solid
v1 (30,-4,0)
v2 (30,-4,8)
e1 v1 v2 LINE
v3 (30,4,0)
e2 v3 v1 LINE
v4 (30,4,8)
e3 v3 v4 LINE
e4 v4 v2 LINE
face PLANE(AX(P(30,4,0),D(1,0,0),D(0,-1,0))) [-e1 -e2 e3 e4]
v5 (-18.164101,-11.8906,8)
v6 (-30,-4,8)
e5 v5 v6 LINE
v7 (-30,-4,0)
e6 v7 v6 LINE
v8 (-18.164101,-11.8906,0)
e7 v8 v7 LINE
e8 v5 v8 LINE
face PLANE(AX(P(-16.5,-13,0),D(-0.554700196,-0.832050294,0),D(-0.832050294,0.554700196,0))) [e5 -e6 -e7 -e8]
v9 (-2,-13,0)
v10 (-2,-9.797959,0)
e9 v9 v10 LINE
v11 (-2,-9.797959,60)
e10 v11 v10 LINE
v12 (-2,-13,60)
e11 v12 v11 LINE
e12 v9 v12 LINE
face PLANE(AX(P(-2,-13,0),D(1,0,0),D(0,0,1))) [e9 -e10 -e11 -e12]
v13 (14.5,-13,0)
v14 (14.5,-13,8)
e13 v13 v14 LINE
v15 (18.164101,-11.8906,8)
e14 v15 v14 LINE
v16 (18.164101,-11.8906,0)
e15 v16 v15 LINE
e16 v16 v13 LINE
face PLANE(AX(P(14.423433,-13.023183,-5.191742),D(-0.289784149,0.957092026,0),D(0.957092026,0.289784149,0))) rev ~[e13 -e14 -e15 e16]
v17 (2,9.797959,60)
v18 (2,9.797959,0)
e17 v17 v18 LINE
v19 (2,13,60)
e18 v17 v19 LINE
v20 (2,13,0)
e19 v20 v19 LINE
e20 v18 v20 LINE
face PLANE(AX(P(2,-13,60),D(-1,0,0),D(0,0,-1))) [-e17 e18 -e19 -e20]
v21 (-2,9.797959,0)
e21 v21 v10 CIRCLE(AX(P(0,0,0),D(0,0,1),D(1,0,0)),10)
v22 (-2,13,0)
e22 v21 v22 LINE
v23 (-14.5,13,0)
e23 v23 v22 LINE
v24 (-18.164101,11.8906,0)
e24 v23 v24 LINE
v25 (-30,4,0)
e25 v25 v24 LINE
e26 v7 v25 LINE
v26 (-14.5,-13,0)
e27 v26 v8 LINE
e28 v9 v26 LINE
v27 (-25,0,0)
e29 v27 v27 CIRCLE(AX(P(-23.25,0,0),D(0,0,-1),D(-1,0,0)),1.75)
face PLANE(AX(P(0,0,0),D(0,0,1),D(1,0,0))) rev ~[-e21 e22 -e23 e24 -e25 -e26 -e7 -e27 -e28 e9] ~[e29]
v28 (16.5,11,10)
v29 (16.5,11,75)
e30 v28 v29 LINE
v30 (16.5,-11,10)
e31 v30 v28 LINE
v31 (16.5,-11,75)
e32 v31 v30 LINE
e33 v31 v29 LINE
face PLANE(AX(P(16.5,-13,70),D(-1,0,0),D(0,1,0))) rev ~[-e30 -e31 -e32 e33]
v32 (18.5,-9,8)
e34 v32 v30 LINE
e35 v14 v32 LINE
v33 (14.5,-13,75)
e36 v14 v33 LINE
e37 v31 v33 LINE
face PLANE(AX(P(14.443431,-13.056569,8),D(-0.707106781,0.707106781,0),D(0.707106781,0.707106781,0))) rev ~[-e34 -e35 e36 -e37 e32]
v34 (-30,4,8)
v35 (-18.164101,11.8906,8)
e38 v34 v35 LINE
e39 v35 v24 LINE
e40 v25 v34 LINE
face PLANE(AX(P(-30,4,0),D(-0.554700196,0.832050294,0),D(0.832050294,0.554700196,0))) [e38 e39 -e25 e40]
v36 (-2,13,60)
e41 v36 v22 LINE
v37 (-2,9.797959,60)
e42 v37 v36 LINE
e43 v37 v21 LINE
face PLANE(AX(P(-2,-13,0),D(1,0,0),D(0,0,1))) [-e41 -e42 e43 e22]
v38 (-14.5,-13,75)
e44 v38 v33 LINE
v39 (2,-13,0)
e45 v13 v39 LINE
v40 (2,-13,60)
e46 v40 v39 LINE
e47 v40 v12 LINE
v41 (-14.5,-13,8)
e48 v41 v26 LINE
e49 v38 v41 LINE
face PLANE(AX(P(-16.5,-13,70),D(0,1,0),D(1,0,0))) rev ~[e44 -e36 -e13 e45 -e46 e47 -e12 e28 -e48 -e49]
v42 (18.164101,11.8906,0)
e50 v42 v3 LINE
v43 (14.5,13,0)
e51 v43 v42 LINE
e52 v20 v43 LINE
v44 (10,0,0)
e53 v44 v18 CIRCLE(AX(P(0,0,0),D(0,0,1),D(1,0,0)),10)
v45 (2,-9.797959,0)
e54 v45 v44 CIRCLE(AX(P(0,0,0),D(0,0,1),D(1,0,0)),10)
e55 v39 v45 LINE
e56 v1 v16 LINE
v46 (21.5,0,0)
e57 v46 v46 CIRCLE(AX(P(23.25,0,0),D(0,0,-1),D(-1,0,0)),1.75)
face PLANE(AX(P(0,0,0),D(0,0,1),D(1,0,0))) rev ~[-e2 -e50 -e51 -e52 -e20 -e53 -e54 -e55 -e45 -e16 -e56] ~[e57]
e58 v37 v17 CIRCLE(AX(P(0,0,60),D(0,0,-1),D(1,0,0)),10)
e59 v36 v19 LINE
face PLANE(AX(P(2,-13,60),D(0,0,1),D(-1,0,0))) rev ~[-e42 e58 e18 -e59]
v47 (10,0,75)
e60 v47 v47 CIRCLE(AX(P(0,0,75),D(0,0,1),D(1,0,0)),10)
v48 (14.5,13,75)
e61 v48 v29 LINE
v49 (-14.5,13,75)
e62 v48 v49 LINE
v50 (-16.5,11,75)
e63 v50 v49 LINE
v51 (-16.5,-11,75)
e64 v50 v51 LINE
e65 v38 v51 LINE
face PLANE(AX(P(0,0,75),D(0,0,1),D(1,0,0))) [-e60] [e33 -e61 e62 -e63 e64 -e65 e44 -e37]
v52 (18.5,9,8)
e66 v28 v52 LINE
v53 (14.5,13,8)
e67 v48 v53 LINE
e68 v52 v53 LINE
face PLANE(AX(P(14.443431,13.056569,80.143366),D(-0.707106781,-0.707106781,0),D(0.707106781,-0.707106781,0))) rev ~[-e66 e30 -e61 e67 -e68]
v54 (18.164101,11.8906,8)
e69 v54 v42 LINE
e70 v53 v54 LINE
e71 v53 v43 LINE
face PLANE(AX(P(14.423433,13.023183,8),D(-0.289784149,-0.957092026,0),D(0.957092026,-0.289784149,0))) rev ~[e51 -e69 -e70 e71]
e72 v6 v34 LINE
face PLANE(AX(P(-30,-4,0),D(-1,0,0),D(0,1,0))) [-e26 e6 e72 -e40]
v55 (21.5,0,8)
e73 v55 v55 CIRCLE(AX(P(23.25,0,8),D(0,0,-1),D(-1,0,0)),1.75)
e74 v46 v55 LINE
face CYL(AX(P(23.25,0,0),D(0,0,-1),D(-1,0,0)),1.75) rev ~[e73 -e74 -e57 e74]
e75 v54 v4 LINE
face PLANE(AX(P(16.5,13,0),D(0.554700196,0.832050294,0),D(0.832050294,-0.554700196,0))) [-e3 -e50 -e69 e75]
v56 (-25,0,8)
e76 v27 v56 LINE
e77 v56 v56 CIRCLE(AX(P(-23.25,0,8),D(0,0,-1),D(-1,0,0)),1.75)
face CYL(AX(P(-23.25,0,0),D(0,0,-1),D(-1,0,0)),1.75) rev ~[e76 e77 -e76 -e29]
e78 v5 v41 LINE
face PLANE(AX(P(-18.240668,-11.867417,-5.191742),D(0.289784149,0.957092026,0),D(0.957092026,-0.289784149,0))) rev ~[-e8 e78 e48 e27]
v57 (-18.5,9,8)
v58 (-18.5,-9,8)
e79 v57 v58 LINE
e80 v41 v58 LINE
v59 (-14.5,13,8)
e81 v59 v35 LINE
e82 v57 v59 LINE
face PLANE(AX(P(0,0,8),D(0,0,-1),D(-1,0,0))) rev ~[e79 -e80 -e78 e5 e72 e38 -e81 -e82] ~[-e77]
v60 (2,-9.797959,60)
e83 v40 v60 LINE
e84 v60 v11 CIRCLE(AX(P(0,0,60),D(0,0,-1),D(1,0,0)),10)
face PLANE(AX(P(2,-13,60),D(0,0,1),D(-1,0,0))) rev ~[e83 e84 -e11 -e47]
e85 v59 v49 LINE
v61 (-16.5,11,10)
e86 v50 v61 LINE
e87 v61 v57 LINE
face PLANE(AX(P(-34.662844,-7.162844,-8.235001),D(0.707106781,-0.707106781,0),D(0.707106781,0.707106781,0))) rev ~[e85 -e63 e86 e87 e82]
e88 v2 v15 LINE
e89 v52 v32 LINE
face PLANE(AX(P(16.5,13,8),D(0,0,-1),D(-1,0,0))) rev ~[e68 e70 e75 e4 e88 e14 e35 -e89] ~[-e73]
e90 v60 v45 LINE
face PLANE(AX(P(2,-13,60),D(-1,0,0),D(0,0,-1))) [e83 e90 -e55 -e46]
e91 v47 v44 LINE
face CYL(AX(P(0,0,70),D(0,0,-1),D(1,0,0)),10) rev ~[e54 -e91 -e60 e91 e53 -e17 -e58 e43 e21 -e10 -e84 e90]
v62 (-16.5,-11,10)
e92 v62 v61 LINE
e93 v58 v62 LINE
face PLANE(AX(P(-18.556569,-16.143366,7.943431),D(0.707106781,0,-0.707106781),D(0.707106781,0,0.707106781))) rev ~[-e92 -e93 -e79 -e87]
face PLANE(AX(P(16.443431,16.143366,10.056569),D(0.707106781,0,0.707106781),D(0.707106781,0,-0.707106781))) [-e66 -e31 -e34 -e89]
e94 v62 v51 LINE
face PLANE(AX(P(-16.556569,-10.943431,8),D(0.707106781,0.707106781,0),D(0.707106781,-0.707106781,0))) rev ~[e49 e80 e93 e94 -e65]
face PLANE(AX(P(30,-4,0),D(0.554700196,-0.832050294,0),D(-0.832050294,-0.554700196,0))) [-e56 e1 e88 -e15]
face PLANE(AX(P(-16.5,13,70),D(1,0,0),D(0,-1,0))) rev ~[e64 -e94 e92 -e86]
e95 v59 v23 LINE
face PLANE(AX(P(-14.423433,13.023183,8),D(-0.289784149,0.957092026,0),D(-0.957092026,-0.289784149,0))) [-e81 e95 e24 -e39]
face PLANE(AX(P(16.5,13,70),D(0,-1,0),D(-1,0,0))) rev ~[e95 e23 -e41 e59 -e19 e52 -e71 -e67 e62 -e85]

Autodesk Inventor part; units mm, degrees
ref_plane "YZ Plane" through (0, 0, 0) normal (1, 0, 0) x (0, 1, 0)
ref_plane "XZ Plane" through (0, 0, 0) normal (0, 1, 0) x (-1, 0, 0)
ref_plane "XY Plane" through (0, 0, 0) normal (0, 0, 1) x (1, 0, 0)
sketch "スケッチ1" plane through (0, 0, 0) normal (0, 0, 1) x (1, 0, 0)
  line L0 (-16.5, 13) -> (16.5, 13)
  line L1 (16.5, 13) -> (16.5, -13)
  line L2 (16.5, -13) -> (-16.5, -13)
  line L3 (-16.5, -13) -> (-16.5, 13)
  line L4 (-16.5, 13) -> (16.5, -13) construction
  line L5 (16.5, 13) -> (-16.5, -13) construction
  circle A0 centre (0, 0) radius 10
  dimension "d0" = 33
  dimension "d1" = 26
  dimension "d2" = 20
extrude "押し出し1" add sketch "スケッチ1" along normal blind 70
sketch "スケッチ2" plane through (-16.5, -13, 0) normal (0, -1, 0) x (1, 0, 0)
  line L0 (18.5, 60) -> (18.5, 0)
  line L1 (18.5, 0) -> (14.5, 0)
  line L2 (14.5, 0) -> (14.5, 60)
  line L3 (18.5, 70) -> (14.5, 0) construction
  line L4 (18.5, 0) -> (14.5, 70) construction
  line L5 (0, 0) -> (33, 0) projected
  line L6 (18.5, 60) -> (14.5, 60)
  point P0 (16.5, 0)
  point P1 (16.5, 35)
  dimension "d5" = 4
extrude "押し出し2" cut sketch "スケッチ2" against normal blind 50
sketch "スケッチ3" plane through (0, 0, 70) normal (0, 0, 1) x (1, 0, 0)
  line L0 (-16.5, -13) -> (16.5, -13) projected
  line L1 (16.5, -13) -> (16.5, 13) projected
  line L2 (16.5, 13) -> (-16.5, 13) projected
  circle A0 centre (0, 0) radius 10 projected
  circle A1 centre (0, 0) radius 10 projected
  line L3 (16.5, 13) -> (-16.5, 13) projected
  line L4 (-16.5, 13) -> (-16.5, -13) projected
  line L5 (-16.5, -13) -> (16.5, -13) projected
  line L6 (16.5, -13) -> (-16.5, -13)
  line L7 (-16.5, -13) -> (-16.5, 13)
  line L8 (-16.5, 13) -> (16.5, 13)
  line L9 (16.5, 13) -> (16.5, -13)
  circle A2 centre (0, 0) radius 10
  line L10 (16.5, -13) -> (16.5, 13) projected
  line L11 (-16.5, 13) -> (-16.5, -13) projected
  dimension "d8" = 20
extrude "押し出し3" add sketch "スケッチ3" along normal blind 5
sketch "スケッチ4" plane through (0, 0, 0) normal (0, 0, -1) x (-1, 0, 0)
  line L0 (30, -4) -> (30, 4)
  line L1 (-30, 4) -> (-30, -4)
  line L2 (-30, -4) -> (30, 4) construction
  line L3 (30, -4) -> (-30, 4) construction
  line L4 (-2, 13) -> (-16.5, 13) projected
  line L5 (-16.5, 13) -> (-30, 4)
  line L6 (-16.5, 13) -> (-16.5, -13) projected
  line L7 (-30, -4) -> (-16.5, -13)
  line L8 (2, -9.798) -> (2, -13) projected
  line L9 (2, -13) -> (16.5, -13) projected
  line L10 (16.5, -13) -> (16.5, 13) projected
  line L11 (16.5, 13) -> (2, 13) projected
  line L12 (2, 13) -> (2, 9.798) projected
  arc A0 (2, -9.798) -> (2, 9.798) centre (0, 0) ccw projected
  line L13 (-2, -13) -> (-2, -9.798) projected
  arc A1 (-2, 9.798) -> (-2, -9.798) centre (0, 0) ccw projected
  line L14 (-2, 9.798) -> (-2, 13) projected
  line L15 (-2, 13) -> (-16.5, 13) projected
  line L16 (-16.5, 13) -> (-16.5, -13) projected
  line L17 (-16.5, -13) -> (-2, -13) projected
  line L18 (16.5, -13) -> (30, -4)
  line L19 (30, 4) -> (16.5, 13)
  circle A2 centre (-23.25, 0) radius 1.75
  circle A3 centre (23.25, 0) radius 1.75
  dimension "d15" = 3.5
  dimension "d16" = 3.5
extrude "押し出し4" add sketch "スケッチ4" against normal blind 8 contours L18 L10 L19 L0 | L5 L6 L7 L1
chamfer "面取り1" distance 2 angle 45 10 edges at (16.5, 0, 8) (-16.5, 0, 8) (16.5, -13, 41.5) (16.5, 13, 41.5) (-16.5, -13, 41.5) (-16.5, -13, 4) (16.5, -13, 4) (-16.5, 13, 41.5) (-16.5, 13, 4) (16.5, 13, 4)
properties part number "RescueKit-Pipev2"
